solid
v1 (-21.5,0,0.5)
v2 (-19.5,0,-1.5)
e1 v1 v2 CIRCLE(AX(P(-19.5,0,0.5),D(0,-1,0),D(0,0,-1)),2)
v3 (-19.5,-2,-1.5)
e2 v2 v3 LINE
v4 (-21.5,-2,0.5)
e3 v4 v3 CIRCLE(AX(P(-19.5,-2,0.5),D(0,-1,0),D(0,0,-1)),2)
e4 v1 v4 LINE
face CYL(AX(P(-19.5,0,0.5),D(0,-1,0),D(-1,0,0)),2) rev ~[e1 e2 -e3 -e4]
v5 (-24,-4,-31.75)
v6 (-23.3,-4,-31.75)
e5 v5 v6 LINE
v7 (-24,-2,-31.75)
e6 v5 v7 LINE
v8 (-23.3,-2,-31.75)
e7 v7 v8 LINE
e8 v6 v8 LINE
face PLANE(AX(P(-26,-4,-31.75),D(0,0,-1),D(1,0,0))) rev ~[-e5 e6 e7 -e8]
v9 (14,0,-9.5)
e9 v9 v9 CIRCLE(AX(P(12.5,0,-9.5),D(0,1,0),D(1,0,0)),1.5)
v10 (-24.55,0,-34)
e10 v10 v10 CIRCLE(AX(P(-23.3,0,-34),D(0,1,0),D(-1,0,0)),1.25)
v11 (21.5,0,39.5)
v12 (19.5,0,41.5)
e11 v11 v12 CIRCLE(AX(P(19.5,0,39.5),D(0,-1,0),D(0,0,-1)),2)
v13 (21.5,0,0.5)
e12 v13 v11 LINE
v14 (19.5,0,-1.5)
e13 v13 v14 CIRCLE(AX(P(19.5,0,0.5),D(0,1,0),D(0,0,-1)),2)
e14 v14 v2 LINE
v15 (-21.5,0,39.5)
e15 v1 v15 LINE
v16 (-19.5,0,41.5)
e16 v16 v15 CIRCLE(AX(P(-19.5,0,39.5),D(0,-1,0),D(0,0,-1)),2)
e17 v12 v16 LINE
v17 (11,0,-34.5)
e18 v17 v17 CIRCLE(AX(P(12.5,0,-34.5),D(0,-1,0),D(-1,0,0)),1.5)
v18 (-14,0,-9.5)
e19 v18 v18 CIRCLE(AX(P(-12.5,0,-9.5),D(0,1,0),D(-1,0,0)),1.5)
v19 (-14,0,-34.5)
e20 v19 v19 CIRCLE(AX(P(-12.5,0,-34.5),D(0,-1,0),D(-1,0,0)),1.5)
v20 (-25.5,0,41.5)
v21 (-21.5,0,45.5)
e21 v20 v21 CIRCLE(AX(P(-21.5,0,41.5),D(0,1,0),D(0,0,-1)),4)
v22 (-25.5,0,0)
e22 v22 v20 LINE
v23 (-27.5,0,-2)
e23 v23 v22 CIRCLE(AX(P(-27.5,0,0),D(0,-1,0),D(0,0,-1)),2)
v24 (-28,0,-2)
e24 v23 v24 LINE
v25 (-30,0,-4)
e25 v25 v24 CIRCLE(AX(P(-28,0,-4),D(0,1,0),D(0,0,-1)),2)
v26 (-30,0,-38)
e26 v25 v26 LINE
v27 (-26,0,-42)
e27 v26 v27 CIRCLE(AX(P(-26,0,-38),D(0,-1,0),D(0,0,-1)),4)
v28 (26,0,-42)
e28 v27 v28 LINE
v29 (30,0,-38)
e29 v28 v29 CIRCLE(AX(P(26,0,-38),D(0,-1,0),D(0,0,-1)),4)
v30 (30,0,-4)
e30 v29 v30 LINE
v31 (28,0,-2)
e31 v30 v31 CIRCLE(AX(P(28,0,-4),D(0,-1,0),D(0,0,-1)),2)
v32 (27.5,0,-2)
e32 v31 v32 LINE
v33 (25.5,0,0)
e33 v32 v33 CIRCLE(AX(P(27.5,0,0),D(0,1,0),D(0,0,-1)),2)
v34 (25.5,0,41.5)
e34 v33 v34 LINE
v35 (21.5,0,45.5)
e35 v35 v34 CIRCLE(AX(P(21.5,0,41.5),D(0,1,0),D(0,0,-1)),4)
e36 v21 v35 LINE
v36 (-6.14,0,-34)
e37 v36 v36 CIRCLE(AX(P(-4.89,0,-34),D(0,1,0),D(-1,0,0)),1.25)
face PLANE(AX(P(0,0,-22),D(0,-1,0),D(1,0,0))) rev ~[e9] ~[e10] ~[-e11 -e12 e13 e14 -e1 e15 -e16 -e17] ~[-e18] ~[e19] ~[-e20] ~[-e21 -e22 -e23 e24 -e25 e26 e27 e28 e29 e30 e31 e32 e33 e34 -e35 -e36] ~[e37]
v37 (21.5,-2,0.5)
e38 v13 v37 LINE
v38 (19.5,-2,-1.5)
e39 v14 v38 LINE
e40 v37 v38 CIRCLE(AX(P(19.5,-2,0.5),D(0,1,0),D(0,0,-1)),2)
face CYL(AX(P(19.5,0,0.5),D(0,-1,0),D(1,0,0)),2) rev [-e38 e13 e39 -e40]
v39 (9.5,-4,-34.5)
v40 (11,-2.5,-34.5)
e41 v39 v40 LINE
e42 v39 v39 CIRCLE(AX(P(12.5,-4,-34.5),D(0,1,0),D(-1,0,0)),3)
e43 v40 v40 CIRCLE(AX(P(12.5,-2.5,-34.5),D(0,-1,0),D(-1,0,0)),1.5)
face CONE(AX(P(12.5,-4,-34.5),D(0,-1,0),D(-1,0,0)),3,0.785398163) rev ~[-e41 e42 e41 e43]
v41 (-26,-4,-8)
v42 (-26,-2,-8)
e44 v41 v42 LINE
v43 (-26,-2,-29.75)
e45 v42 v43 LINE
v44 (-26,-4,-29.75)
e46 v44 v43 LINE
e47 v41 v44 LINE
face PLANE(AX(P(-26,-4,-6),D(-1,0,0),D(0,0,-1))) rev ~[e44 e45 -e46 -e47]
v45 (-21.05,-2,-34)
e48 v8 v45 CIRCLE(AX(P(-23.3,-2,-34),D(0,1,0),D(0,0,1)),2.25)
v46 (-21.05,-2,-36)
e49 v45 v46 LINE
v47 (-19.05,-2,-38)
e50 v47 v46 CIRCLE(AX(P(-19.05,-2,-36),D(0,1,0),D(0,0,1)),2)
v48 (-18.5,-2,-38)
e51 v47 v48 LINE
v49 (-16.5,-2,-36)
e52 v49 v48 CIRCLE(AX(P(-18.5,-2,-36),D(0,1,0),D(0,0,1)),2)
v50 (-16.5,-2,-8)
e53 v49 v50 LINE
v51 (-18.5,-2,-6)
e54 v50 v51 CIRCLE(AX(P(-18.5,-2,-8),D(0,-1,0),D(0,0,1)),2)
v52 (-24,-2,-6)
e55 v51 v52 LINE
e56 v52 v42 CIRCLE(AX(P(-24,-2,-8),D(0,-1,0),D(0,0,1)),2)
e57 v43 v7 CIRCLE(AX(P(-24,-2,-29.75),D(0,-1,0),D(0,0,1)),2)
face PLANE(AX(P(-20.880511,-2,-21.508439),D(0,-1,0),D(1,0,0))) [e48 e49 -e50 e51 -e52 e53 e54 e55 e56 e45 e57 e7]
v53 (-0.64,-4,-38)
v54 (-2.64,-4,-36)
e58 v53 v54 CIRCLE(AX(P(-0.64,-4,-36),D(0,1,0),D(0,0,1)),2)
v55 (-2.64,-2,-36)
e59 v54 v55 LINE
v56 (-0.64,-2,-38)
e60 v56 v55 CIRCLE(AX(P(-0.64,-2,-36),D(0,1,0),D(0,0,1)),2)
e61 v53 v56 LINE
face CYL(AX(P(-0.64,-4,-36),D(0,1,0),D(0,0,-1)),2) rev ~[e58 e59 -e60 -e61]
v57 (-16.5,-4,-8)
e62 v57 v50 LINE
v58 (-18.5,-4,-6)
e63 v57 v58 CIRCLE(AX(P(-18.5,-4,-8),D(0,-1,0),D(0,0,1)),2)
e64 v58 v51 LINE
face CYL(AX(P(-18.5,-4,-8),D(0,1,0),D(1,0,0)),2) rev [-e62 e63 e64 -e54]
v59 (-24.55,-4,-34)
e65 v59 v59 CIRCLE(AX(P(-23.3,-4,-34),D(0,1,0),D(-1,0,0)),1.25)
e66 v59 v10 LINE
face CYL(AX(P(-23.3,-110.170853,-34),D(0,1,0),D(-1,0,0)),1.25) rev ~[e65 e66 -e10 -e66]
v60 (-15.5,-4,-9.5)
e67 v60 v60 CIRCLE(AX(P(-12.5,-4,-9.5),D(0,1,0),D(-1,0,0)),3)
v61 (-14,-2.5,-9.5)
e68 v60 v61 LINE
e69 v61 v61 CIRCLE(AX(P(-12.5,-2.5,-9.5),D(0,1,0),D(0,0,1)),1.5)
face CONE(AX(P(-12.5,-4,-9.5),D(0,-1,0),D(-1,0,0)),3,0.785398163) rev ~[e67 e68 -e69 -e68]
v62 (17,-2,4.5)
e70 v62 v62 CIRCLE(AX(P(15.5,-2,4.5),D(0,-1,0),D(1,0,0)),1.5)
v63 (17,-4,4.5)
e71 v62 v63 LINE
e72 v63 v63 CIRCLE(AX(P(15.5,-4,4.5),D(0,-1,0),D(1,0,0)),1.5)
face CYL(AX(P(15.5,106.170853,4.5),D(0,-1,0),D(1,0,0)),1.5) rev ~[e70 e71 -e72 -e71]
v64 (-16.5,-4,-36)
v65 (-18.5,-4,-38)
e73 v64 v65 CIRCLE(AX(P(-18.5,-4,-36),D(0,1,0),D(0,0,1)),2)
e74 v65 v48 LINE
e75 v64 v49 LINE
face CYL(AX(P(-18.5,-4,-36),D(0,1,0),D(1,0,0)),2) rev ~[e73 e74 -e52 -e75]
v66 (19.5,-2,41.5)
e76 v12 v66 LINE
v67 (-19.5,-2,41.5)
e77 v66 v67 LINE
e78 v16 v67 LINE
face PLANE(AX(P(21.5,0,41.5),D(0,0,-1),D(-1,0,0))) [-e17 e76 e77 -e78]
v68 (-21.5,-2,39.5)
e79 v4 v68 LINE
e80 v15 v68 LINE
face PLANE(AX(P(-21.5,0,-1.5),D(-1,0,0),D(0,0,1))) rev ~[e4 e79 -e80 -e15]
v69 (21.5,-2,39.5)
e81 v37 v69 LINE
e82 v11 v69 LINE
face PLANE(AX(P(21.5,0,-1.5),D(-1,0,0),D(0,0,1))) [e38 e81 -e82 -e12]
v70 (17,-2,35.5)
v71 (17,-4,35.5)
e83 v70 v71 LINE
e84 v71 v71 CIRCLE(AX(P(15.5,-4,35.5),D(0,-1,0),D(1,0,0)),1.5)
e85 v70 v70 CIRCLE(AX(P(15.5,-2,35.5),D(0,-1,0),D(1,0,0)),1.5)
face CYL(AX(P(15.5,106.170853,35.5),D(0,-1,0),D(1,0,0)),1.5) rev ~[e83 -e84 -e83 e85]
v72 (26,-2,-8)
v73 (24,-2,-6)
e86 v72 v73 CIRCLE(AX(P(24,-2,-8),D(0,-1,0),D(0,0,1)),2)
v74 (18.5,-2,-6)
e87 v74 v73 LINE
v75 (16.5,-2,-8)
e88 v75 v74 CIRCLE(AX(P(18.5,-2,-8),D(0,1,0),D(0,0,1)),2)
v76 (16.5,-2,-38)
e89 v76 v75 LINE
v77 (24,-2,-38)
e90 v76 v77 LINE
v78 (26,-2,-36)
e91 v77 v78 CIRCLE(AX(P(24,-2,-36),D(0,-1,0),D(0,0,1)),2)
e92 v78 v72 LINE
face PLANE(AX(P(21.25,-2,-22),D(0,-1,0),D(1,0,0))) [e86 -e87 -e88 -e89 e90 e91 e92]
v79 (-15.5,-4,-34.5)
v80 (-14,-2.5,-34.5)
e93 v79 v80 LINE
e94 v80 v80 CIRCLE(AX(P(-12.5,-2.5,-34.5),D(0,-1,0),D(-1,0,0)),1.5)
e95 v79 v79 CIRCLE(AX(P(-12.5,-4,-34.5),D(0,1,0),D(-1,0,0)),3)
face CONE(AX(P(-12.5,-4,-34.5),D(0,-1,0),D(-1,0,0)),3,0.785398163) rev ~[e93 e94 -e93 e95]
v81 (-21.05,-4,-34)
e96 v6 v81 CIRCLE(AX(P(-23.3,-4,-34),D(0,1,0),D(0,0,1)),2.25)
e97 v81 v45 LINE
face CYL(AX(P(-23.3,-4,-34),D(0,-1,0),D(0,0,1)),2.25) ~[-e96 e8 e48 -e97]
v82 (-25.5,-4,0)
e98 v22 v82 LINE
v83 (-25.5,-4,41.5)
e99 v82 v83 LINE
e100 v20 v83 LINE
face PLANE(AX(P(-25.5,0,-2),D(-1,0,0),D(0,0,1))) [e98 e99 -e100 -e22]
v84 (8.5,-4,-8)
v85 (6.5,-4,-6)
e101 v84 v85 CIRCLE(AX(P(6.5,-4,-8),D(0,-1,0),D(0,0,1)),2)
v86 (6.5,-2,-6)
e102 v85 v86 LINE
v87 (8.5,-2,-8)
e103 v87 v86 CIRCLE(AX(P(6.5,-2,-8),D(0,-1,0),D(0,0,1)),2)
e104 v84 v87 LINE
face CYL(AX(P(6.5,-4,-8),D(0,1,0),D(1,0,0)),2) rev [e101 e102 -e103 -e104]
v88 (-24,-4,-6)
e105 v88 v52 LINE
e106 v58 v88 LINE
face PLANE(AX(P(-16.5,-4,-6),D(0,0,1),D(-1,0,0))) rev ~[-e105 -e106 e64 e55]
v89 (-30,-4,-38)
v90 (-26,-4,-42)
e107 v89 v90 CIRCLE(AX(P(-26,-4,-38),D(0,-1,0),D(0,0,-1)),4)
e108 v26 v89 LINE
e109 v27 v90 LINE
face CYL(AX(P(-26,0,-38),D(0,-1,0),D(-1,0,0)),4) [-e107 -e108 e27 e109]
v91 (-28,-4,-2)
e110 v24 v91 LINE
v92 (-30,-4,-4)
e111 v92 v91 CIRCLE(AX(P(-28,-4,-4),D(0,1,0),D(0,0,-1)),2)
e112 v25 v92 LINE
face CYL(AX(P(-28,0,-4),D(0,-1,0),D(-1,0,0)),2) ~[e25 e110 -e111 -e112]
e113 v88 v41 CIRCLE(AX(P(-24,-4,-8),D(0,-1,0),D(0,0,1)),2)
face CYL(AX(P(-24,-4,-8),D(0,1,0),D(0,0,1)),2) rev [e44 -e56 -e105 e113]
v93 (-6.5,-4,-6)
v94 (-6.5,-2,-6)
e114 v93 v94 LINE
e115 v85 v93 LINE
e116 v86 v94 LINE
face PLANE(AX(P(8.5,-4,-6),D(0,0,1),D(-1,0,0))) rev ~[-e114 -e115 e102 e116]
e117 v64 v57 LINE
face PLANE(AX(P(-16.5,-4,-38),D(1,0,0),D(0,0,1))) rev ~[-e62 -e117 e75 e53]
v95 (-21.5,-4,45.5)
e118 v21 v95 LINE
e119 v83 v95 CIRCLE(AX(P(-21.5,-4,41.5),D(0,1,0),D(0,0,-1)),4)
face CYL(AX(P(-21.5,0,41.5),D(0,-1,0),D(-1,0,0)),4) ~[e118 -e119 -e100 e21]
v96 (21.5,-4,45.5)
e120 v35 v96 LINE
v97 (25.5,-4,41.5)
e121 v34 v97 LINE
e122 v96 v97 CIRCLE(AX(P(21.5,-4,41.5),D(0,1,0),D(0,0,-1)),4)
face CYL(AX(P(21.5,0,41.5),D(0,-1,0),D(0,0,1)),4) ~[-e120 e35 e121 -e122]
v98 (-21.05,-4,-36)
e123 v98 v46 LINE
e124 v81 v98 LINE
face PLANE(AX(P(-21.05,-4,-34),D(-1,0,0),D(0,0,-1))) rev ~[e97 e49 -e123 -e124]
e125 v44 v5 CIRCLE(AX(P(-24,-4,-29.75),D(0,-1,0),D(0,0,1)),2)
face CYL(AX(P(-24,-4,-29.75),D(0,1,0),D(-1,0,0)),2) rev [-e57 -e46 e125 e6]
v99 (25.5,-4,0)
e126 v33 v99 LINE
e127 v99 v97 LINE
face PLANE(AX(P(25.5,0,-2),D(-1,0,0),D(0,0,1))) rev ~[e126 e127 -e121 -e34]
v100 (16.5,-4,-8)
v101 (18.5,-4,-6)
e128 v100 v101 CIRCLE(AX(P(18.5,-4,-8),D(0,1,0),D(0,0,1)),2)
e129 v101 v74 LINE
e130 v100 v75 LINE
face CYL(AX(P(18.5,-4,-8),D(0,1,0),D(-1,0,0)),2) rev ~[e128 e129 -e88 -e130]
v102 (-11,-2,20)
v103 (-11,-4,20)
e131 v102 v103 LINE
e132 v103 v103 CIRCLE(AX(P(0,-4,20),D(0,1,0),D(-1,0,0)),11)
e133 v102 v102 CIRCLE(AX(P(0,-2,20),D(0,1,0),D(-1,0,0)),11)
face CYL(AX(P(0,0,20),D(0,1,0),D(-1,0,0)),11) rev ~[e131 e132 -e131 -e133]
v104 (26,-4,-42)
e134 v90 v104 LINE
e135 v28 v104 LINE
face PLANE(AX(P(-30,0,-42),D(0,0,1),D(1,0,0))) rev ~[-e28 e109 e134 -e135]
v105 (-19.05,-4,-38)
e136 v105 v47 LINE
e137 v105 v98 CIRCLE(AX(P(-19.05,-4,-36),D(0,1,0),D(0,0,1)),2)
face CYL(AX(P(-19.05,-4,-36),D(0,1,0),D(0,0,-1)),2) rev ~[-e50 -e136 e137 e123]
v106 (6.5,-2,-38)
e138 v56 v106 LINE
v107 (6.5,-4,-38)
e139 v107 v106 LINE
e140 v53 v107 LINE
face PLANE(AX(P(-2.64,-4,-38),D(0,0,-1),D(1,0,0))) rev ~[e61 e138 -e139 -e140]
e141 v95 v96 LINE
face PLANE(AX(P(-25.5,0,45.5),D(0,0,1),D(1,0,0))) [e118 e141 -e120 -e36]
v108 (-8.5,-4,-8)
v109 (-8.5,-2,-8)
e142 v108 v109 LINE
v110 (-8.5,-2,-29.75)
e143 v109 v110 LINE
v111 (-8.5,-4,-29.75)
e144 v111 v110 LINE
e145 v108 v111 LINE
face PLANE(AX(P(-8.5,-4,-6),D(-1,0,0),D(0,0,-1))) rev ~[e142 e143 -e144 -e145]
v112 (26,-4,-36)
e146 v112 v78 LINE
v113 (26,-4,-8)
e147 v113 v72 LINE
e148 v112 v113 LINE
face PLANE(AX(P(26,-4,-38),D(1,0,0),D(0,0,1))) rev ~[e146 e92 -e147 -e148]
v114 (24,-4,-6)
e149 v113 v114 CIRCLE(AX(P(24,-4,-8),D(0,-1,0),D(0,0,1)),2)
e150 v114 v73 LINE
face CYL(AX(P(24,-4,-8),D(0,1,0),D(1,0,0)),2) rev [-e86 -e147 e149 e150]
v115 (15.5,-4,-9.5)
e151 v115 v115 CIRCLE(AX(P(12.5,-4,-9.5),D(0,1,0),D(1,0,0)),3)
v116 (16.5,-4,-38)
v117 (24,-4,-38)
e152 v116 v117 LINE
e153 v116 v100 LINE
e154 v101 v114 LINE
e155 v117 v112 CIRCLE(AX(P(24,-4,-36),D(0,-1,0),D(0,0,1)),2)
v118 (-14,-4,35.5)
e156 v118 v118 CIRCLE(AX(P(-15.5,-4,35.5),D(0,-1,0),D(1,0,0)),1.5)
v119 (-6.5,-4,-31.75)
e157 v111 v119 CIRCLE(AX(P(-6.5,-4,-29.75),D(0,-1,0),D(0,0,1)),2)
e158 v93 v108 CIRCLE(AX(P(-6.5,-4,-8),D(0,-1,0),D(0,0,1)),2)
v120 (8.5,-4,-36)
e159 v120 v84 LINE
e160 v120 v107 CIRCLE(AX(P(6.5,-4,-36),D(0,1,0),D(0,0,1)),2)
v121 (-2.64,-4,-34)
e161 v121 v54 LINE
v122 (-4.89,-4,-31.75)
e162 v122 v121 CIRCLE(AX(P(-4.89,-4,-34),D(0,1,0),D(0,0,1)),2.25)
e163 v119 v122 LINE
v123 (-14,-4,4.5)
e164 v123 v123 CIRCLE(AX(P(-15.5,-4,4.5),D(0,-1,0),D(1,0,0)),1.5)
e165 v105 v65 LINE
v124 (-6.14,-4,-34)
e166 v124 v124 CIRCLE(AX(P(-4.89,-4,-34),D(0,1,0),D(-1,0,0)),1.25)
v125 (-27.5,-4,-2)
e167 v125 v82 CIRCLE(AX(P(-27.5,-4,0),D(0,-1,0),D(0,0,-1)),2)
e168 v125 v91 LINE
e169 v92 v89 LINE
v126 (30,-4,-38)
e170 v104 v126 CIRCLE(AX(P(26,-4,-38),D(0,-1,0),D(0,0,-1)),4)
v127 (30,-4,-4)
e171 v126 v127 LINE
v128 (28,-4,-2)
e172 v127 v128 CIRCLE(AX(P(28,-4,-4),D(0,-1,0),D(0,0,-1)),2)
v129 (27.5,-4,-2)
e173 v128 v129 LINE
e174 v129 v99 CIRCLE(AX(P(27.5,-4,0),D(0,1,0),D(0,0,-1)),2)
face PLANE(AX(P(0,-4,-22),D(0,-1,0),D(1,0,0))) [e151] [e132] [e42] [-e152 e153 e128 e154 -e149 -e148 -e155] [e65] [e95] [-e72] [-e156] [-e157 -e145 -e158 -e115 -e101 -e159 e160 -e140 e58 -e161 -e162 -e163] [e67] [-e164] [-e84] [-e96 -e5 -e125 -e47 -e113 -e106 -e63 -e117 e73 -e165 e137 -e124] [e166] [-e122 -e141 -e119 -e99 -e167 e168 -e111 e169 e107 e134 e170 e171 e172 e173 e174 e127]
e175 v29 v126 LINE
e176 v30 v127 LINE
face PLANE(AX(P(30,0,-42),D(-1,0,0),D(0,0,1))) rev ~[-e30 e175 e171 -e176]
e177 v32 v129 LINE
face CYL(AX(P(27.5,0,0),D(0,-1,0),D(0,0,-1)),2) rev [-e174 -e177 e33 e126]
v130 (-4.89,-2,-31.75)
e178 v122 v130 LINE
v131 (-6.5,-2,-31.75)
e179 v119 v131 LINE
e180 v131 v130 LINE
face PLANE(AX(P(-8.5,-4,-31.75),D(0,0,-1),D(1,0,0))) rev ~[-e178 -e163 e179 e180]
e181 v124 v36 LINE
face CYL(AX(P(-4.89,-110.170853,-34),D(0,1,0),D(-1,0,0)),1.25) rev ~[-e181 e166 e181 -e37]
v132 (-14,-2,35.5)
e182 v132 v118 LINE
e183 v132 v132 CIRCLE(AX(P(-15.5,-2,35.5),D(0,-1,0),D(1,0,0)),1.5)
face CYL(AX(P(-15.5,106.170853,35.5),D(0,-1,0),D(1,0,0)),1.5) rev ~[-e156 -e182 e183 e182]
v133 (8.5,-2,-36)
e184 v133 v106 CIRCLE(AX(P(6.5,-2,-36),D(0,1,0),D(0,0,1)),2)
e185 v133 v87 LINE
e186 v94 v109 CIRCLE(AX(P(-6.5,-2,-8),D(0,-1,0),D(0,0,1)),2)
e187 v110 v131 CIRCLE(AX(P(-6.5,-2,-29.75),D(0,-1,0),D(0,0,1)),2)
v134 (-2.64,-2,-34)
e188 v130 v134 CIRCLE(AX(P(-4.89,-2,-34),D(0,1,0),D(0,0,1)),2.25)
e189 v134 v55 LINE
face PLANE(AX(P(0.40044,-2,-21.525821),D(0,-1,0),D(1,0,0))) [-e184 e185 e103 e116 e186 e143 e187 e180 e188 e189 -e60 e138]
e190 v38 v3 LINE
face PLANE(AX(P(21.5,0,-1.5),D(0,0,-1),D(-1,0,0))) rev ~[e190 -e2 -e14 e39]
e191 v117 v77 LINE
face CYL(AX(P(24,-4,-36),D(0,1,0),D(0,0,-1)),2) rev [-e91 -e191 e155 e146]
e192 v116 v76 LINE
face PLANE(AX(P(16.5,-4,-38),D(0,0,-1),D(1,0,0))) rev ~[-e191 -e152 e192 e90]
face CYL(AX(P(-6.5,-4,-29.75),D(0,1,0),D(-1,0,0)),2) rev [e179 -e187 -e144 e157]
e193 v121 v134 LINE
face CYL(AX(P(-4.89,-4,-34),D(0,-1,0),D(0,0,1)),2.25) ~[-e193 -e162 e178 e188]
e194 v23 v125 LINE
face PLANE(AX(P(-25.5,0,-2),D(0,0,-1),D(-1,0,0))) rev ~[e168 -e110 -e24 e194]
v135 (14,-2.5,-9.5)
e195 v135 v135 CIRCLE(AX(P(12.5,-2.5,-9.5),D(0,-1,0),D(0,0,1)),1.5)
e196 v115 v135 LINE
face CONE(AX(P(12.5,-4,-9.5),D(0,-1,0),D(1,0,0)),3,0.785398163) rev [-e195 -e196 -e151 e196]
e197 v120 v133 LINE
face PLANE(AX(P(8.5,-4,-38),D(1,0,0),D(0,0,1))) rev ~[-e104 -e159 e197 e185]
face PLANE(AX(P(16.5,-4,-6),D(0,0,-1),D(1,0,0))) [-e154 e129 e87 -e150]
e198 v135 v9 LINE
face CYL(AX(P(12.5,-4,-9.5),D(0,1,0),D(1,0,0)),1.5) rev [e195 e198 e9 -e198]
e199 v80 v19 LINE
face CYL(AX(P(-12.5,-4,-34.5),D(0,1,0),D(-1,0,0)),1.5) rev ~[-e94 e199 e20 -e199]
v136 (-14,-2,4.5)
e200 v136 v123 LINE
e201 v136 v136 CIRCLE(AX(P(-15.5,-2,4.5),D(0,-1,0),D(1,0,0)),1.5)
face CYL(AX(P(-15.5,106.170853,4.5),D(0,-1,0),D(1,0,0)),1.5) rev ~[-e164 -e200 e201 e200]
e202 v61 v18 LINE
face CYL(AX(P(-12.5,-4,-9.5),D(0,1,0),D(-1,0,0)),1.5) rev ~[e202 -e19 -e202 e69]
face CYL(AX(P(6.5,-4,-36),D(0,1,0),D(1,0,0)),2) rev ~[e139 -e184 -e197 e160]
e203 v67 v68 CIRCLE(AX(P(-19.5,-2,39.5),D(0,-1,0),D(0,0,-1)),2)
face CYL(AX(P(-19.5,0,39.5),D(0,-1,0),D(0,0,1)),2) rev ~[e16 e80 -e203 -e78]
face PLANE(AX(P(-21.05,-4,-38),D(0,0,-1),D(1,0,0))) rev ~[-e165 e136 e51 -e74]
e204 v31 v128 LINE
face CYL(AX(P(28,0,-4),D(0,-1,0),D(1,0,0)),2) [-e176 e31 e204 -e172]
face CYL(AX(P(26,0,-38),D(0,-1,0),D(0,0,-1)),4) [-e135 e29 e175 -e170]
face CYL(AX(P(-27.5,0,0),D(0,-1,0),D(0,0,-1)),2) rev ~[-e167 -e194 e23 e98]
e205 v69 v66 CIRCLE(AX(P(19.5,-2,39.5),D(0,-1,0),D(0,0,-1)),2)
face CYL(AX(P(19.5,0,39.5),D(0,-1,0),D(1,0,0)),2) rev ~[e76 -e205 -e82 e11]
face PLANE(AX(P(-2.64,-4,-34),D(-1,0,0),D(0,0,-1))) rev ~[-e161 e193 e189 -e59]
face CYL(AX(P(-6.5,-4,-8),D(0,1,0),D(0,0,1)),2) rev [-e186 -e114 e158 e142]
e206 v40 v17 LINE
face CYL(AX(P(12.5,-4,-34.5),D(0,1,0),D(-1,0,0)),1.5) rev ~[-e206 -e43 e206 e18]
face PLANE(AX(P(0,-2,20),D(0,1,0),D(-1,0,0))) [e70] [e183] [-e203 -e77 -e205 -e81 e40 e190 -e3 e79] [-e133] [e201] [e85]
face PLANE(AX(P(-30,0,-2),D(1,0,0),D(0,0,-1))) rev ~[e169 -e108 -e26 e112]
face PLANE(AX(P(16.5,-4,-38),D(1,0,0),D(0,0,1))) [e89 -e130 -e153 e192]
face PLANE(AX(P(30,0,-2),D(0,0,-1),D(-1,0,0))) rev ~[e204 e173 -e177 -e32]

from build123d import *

# Parameters (mm, degrees)
F0_W           = 51
F0_H           = 47.5
F1_DEPTH       = 4
F2_W           = 43
F2_H           = 43
F2_R           = 11
F3_DEPTH       = 2
F4_DEPTH       = 4.001
F5_D           = 3
F6_R           = 2
F7_W           = 9.5
F7_H           = 32
F8_DEPTH       = 2
F9_D           = 3
F9_CSINK_D     = 6
F9_CSINK_ANGLE = 90
F10_D          = 2.5
F11_R          = 2
F13_R          = 4


# Not quite as in the source:
# - two fillets or chamfers of one size are made in one step
# - a pattern or mirror of a feature is missing from the dataset's text; its kind, count and spacing are read off the source's solid


with BuildPart() as f1:
    # F0 (on Front) → F1 (new body)
    with BuildSketch(Plane.XZ):
        Polygon((25.5, -2), (-25.5, -2), (-30, -2), (-30, -42), (30, -42), (30, -2), align=None)
        with Locations((0, 21.75)):
            Rectangle(F0_W, F0_H)
    extrude(amount=F1_DEPTH)

    # F2 (on face) → F3 (cut)
    with BuildSketch(Plane(origin=(0, 0, 0), x_dir=(-1, 0, 0), z_dir=(0, 1, 0))):
        with Locations((0, 20)):
            Rectangle(F2_W, F2_H)
        with Locations((0, 20)):
            Circle(F2_R, mode=Mode.SUBTRACT)
    extrude(amount=-F3_DEPTH, mode=Mode.SUBTRACT)

    # F2 (on face) → F4 (cut, through all)
    with BuildSketch(Plane(origin=(0, 0, 0), x_dir=(-1, 0, 0), z_dir=(0, 1, 0))):
        with Locations((0, 20)):
            Circle(F2_R)
    extrude(amount=-F4_DEPTH, mode=Mode.SUBTRACT)

    # F5 (through all)
    with Locations(Plane(origin=(0, 0, 0), x_dir=(-1, 0, 0), z_dir=(0, 1, 0))):
        with Locations((-15.5, 35.5), (15.5, 35.5), (15.5, 4.5), (-15.5, 4.5)):
            Hole(F5_D / 2)

    # F6
    f6_edges = [f1.edges().sort_by_distance(p)[0] for p in [
        (21.5, -1, 41.5),
        (-21.5, -1, 41.5),
        (-21.5, -1, -1.5),
        (21.5, -1, -1.5),
    ]]
    fillet(f6_edges, radius=F6_R)

    # F7 (on face) → F8 (cut)
    with BuildSketch(Plane.XZ.offset(4)):
        with BuildLine():
            Line((-16.5, -38), (-16.5, -6))
            Line((-16.5, -6), (-26, -6))
            Line((-26, -6), (-26, -31.75))
            Line((-26, -31.75), (-23.3, -31.75))
            ThreePointArc((-23.3, -31.75), (-21.7090097423, -32.4090097423), (-21.05, -34))
            Line((-21.05, -34), (-21.05, -38))
            Line((-21.05, -38), (-16.5, -38))
        make_face()
        with BuildLine():
            Line((8.5, -38), (8.5, -6))
            Line((8.5, -6), (-8.5, -6))
            Line((-8.5, -6), (-8.5, -31.75))
            Line((-8.5, -31.75), (-4.89, -31.75))
            ThreePointArc((-4.89, -31.75), (-3.2990097423, -32.4090097423), (-2.64, -34))
            Line((-2.64, -34), (-2.64, -38))
            Line((-2.64, -38), (8.5, -38))
        make_face()
        with Locations((21.25, -22)):
            Rectangle(F7_W, F7_H)
    extrude(amount=-F8_DEPTH, mode=Mode.SUBTRACT)

    # F9 (through all)
    with Locations(Plane.XZ.offset(4)):
        with Locations((-12.5, -9.5), (-12.5, -9.5), (-12.5, -34.5), (12.5, -34.5)):
            f9 = CounterSinkHole(F9_D / 2, F9_CSINK_D / 2, counter_sink_angle=F9_CSINK_ANGLE)

    # F9_copies: F9 across plane
    add(f9.mirror(Plane(origin=(0, 0, 0), x_dir=(0, 0, 1), z_dir=(1, 0, 0))), mode=Mode.SUBTRACT)

    # F10 (through all)
    with Locations(Plane.XZ.offset(4)):
        with Locations((-23.3, -34), (-4.89, -34)):
            Hole(F10_D / 2)

    # F11
    f11_edges = [f1.edges().sort_by_distance(p)[0] for p in [
        (-26, -3, -6),
        (26, -3, -6),
        (26, -3, -38),
        (-16.5, -3, -38),
        (8.5, -3, -38),
        (-16.5, -3, -6),
        (8.5, -3, -6),
        (-8.5, -3, -6),
        (16.5, -3, -6),
        (-8.5, -3, -31.75),
        (-25.5, -2, -2),
        (-30, -2, -2),
        (25.5, -2, -2),
        (30, -2, -2),
        (-21.05, -3, -38),
        (-26, -3, -31.75),
        (-2.64, -3, -38),
    ]]
    fillet(f11_edges, radius=F11_R)

    # F13
    f13_edges = [f1.edges().sort_by_distance(p)[0] for p in [
        (25.5, -2, 45.5),
        (-25.5, -2, 45.5),
        (-30, -2, -42),
        (30, -2, -42),
    ]]
    fillet(f13_edges, radius=F13_R)


solid = f1.part
